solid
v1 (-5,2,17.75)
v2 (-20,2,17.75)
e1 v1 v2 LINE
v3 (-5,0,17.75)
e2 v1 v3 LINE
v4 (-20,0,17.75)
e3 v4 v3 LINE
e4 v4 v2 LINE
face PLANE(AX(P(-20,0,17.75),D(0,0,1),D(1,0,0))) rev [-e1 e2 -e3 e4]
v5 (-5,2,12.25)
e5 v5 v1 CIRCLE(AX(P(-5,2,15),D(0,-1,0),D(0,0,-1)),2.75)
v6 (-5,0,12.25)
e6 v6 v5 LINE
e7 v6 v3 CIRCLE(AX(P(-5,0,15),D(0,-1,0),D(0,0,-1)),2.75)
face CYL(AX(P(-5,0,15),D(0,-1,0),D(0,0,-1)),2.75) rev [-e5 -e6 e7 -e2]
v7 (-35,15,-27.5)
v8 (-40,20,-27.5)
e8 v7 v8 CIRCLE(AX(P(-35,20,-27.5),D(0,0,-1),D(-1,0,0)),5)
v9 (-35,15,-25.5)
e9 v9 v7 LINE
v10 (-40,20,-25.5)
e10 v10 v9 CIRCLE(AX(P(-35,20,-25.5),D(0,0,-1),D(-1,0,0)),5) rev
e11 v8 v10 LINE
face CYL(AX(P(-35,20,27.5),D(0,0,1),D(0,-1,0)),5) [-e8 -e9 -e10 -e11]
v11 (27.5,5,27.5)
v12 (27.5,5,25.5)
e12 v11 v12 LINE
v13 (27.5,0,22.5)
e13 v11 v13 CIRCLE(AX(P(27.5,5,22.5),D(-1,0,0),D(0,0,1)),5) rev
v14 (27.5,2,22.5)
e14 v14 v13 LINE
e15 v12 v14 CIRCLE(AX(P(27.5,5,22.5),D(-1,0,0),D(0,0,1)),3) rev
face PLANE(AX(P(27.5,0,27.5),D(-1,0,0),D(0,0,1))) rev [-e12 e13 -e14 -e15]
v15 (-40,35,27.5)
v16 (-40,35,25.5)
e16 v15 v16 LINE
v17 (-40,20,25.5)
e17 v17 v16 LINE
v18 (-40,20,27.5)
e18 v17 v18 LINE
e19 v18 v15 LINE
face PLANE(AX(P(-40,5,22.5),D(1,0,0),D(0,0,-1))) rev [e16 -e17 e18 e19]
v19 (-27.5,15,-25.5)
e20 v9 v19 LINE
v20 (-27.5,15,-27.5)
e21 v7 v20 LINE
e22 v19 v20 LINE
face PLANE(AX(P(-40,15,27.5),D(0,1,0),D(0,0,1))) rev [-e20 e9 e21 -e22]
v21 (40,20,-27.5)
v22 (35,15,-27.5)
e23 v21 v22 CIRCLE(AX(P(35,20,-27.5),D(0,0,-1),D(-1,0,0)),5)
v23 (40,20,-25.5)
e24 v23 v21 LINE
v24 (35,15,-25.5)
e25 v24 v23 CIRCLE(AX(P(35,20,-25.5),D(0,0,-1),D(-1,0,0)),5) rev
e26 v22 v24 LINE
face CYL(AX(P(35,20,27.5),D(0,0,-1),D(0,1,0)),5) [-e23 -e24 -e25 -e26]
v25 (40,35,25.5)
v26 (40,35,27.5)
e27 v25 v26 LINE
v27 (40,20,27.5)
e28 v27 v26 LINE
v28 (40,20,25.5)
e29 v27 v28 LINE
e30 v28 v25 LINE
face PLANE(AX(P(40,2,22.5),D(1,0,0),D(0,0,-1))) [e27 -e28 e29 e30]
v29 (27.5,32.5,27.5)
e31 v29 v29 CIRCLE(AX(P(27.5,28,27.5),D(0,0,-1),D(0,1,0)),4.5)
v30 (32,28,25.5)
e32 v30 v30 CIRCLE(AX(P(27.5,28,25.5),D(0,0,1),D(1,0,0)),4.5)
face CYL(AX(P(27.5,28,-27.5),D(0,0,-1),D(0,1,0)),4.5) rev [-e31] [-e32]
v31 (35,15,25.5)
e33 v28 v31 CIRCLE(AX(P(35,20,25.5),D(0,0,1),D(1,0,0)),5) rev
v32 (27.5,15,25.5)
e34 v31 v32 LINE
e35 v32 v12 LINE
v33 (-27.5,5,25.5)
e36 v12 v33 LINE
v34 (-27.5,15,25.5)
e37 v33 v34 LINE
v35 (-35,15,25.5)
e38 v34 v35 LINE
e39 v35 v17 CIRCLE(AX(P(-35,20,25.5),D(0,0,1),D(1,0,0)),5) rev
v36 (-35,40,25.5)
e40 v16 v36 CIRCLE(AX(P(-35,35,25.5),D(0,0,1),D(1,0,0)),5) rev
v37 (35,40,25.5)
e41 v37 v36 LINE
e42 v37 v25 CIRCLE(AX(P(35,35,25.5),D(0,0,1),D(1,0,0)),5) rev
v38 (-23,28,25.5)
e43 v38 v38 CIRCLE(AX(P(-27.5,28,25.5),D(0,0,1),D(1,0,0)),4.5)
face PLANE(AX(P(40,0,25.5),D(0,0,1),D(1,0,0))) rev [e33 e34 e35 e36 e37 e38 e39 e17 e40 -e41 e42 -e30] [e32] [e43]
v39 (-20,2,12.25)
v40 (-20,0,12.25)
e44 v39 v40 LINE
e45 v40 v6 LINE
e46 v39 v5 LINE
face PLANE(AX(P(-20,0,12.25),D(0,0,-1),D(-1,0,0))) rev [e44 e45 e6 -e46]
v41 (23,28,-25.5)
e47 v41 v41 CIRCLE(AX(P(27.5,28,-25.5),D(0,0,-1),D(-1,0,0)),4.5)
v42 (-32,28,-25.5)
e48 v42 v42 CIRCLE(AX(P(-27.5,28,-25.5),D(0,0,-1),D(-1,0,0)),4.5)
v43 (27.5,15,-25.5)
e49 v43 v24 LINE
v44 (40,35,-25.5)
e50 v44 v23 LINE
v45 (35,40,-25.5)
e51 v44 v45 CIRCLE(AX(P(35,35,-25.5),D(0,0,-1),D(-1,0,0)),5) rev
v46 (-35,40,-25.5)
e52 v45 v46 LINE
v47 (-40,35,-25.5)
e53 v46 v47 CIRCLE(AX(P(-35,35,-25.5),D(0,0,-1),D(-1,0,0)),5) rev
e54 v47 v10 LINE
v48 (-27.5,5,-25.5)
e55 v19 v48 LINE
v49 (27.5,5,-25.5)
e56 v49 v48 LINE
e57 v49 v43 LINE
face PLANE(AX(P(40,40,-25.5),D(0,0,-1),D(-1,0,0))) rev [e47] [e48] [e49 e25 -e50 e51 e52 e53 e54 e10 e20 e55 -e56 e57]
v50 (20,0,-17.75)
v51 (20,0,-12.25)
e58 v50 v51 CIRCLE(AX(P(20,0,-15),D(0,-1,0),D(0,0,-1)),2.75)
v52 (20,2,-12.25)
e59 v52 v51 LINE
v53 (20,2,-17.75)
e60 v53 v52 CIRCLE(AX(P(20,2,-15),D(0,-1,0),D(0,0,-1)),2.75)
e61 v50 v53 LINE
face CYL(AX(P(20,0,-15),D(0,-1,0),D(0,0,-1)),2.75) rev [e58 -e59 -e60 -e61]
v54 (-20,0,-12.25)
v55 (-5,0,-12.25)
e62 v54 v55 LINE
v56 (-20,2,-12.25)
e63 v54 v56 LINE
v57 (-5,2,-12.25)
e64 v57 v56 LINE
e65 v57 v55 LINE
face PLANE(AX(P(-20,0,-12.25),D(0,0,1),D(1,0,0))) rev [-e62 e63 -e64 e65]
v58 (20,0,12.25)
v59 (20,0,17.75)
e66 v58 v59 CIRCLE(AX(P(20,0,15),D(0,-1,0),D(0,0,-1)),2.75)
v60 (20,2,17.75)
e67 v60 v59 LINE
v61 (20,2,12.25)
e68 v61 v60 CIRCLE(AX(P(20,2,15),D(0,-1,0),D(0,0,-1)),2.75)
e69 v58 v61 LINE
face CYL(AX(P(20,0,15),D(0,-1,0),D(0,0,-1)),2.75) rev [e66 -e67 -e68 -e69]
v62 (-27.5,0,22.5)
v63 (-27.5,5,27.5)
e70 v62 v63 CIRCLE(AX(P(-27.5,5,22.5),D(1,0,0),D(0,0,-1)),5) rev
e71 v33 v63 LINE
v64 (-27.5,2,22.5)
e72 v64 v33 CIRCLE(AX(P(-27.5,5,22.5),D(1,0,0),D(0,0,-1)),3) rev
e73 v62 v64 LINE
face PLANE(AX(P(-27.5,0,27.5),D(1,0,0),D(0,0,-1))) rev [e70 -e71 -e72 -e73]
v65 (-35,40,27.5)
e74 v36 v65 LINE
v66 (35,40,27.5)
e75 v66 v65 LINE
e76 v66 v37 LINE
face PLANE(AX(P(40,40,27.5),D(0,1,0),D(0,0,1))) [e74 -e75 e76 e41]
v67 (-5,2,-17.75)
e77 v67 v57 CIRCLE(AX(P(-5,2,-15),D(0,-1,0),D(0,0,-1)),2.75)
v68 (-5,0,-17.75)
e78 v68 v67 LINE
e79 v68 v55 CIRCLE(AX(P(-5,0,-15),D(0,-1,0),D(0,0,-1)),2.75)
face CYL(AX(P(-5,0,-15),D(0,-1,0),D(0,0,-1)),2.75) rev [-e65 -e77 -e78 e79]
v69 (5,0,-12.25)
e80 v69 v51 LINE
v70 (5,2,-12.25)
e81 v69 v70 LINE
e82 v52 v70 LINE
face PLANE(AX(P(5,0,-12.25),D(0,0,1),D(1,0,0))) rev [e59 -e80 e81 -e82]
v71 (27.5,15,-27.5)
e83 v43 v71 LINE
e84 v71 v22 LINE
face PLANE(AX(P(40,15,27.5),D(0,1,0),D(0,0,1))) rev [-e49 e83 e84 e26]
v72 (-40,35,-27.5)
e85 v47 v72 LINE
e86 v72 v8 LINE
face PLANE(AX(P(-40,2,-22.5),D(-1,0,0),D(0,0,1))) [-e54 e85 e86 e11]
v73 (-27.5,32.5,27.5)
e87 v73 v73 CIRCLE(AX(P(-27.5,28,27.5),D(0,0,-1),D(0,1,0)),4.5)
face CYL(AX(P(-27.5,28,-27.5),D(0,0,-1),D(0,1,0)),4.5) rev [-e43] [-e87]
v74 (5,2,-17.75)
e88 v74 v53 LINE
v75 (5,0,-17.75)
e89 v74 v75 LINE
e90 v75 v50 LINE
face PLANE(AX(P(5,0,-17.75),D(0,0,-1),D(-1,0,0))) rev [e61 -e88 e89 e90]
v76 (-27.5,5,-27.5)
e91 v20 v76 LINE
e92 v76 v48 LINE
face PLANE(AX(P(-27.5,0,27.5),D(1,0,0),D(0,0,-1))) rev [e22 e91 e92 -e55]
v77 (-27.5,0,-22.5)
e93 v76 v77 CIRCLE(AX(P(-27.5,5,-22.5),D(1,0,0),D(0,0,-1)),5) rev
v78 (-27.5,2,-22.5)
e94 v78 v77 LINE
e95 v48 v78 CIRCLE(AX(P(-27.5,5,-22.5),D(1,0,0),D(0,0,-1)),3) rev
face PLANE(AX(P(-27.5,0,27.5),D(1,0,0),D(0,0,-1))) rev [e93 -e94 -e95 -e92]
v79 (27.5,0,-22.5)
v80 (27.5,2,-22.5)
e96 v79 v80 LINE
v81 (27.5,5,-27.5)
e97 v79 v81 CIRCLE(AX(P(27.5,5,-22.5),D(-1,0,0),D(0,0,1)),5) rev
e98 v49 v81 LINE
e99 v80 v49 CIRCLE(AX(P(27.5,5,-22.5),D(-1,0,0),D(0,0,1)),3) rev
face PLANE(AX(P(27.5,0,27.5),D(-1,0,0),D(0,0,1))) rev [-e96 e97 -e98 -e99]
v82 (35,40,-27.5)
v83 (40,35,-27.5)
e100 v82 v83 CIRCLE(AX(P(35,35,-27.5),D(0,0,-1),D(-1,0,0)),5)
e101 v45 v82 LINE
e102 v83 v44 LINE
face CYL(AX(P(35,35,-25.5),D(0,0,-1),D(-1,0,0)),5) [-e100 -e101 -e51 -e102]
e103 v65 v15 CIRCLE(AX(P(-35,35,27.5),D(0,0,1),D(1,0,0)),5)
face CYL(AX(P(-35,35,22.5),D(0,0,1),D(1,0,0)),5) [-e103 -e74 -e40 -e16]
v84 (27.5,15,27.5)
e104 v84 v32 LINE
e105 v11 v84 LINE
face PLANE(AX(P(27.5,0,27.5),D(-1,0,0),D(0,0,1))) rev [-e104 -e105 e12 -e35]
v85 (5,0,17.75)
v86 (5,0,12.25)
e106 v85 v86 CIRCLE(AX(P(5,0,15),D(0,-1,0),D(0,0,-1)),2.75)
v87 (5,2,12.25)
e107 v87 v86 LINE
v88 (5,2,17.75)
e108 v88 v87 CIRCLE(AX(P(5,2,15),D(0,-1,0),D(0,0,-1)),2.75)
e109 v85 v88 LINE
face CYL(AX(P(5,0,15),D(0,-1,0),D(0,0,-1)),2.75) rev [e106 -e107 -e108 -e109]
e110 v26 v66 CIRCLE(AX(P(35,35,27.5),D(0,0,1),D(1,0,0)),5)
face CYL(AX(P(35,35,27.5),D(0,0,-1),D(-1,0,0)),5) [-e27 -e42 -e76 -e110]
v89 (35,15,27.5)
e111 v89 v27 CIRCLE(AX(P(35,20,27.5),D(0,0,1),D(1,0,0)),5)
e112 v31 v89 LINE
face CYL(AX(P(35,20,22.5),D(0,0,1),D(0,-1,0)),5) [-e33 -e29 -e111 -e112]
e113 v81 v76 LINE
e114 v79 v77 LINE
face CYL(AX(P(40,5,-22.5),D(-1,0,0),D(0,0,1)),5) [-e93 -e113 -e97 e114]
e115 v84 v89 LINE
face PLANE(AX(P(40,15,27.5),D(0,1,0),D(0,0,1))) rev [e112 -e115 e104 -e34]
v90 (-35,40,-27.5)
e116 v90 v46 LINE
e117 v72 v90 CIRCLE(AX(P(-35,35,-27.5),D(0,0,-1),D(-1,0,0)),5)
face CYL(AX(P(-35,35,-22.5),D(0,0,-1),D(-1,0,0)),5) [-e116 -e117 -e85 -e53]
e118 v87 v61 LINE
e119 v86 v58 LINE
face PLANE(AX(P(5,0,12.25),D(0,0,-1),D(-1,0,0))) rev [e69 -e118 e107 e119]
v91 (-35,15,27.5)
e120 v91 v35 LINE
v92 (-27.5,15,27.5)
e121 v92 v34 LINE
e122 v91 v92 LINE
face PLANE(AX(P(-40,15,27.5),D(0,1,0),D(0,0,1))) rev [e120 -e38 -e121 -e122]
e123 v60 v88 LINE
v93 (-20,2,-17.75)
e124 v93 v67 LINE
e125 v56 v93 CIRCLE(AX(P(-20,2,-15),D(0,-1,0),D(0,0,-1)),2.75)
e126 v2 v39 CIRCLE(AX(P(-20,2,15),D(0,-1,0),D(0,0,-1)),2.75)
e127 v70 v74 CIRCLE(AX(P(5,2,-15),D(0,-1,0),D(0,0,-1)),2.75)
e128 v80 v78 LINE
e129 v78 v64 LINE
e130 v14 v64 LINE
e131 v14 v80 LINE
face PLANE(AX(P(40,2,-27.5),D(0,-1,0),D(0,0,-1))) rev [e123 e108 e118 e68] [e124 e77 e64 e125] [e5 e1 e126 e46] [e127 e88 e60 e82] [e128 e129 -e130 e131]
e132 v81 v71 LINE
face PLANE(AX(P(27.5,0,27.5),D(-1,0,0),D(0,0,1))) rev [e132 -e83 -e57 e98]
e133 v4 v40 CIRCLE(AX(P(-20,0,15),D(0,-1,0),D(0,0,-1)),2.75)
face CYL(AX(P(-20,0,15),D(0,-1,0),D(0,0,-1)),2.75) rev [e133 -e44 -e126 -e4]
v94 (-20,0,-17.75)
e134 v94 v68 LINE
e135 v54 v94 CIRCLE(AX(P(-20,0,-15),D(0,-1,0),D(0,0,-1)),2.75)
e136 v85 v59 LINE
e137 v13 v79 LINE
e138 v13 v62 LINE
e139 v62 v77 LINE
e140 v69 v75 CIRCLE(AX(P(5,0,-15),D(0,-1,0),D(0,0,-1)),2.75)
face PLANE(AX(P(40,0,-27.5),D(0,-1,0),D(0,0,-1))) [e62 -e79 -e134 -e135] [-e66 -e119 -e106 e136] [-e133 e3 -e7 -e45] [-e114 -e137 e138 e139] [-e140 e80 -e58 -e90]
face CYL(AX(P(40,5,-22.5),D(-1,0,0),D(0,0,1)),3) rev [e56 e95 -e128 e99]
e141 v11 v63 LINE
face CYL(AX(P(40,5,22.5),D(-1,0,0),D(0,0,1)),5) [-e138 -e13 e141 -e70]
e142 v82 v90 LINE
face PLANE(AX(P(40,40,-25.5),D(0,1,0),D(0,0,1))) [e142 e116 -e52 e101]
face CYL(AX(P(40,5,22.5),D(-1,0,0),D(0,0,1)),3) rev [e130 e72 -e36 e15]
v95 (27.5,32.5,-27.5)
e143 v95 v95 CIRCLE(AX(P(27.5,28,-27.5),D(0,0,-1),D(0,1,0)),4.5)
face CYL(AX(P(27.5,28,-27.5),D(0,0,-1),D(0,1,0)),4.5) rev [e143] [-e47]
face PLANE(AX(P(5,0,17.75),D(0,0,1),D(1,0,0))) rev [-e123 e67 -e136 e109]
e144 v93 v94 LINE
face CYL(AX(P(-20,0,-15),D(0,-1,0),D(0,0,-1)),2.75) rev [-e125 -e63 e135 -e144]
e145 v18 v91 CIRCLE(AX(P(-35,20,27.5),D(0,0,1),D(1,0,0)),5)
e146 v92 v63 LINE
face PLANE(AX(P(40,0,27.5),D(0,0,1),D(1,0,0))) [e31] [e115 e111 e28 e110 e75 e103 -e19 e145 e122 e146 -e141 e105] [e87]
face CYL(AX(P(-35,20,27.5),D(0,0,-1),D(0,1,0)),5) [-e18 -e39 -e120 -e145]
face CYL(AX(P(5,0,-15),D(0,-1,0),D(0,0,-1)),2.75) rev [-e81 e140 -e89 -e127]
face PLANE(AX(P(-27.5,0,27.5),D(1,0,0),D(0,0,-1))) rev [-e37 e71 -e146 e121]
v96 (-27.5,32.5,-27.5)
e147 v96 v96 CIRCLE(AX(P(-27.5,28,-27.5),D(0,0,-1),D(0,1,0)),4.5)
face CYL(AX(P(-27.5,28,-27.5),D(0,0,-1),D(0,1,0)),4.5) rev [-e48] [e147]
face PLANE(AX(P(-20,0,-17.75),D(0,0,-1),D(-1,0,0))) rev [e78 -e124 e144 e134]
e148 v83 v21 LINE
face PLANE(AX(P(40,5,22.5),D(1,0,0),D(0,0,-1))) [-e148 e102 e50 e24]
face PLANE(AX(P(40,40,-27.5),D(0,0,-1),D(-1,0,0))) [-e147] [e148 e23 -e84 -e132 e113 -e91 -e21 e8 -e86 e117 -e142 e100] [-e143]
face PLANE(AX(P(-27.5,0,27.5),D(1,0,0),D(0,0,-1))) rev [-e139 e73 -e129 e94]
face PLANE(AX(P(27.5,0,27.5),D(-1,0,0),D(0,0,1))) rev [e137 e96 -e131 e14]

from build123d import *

# Parameters (mm, degrees)
ODGI_CIE_BAZOWE1_DEPTH      = 40
SZCZELINA_POD_RUB_M52_DEPTH = 2
OTW_R_POD_RUB_M81_D         = 9
SZKIC10_W                   = 12.5
SZKIC10_H                   = 15
WYTNIJ_WYCI_GNI_CIE1_DEPTH  = 79.89866919
ZAOKR_GLENIE1_R             = 5


# Read off the part's stored shape, not the designer's step: Szczelina pod śrubę M52
# Sheet-metal steps are written as plain solids
with BuildPart() as part:
    # Szkic1 → Odgięcie bazowe1 (new, symmetric)
    with BuildSketch(Plane(origin=(0, 0, 0), x_dir=(0, 0, -1), z_dir=(1, 0, 0))):
        with BuildLine():
            Line((27.5, 40), (27.5, 5))
            ThreePointArc((27.5, 5), (26.035533906, 1.464466094), (22.5, 0))
            Line((22.5, 0), (-22.5, 0))
            ThreePointArc((-22.5, 0), (-26.035533906, 1.464466094), (-27.5, 5))
            Line((-27.5, 5), (-27.5, 40))
            Line((-27.5, 40), (-25.5, 40))
            Line((-25.5, 40), (-25.5, 5))
            ThreePointArc((-25.5, 5), (-24.621320344, 2.878679656), (-22.5, 2))
            Line((-22.5, 2), (22.5, 2))
            ThreePointArc((22.5, 2), (24.621320344, 2.878679656), (25.5, 5))
            Line((25.5, 5), (25.5, 40))
            Line((25.5, 40), (27.5, 40))
        make_face()
    extrude(amount=ODGI_CIE_BAZOWE1_DEPTH, both=True)

    # Szczelina pod śrubę M52 outline → Szczelina pod śrubę M52 (cut)
    with BuildSketch(Plane(origin=(0, 0, 0), x_dir=(1, 0, 0), z_dir=(0, 1, 0))):
        with BuildLine():
            ThreePointArc((5, -12.25), (2.25, -15), (5, -17.75))
            Line((5, -17.75), (20, -17.75))
            ThreePointArc((20, -17.75), (22.75, -15), (20, -12.25))
            Line((20, -12.25), (5, -12.25))
        make_face()
        with BuildLine():
            ThreePointArc((-20, -12.25), (-22.75, -15), (-20, -17.75))
            Line((-20, -17.75), (-5, -17.75))
            ThreePointArc((-5, -17.75), (-2.25, -15), (-5, -12.25))
            Line((-5, -12.25), (-20, -12.25))
        make_face()
        with BuildLine():
            ThreePointArc((-5, 12.25), (-2.25, 15), (-5, 17.75))
            Line((-5, 17.75), (-20, 17.75))
            ThreePointArc((-20, 17.75), (-22.75, 15), (-20, 12.25))
            Line((-20, 12.25), (-5, 12.25))
        make_face()
        with BuildLine():
            ThreePointArc((20, 12.25), (22.75, 15), (20, 17.75))
            Line((20, 17.75), (5, 17.75))
            ThreePointArc((5, 17.75), (2.25, 15), (5, 12.25))
            Line((5, 12.25), (20, 12.25))
        make_face()
    extrude(amount=SZCZELINA_POD_RUB_M52_DEPTH, mode=Mode.SUBTRACT)

    # Otwór pod śrubę M81 (through all)
    with Locations(Plane(origin=(0, 0, -27.5), x_dir=(-1, 0, 0), z_dir=(0, 0, -1))):
        with Locations((-27.5, 28), (27.5, 28)):
            Hole(OTW_R_POD_RUB_M81_D / 2)

    # Szkic10 → Wytnij-wyciągnięcie1 (cut, through all)
    with BuildSketch(Plane(origin=(0, 0, -27.5), x_dir=(-1, 0, 0), z_dir=(0, 0, -1))):
        with Locations((-33.75, 7.5)):
            Rectangle(SZKIC10_W, SZKIC10_H)
        with Locations((33.75, 7.5)):
            Rectangle(SZKIC10_W, SZKIC10_H)
    extrude(amount=-WYTNIJ_WYCI_GNI_CIE1_DEPTH, mode=Mode.SUBTRACT)

    # Zaokrąglenie1
    zaokr_glenie1_edges = [part.edges().sort_by_distance(p)[0] for p in [
        (-40, 40, -26.5),
        (-40, 40, 26.5),
        (40, 15, -26.5),
        (40, 15, 26.5),
        (-40, 15, -26.5),
        (-40, 15, 26.5),
        (40, 40, -26.5),
        (40, 40, 26.5),
    ]]
    fillet(zaokr_glenie1_edges, radius=ZAOKR_GLENIE1_R)


solid = part.part
